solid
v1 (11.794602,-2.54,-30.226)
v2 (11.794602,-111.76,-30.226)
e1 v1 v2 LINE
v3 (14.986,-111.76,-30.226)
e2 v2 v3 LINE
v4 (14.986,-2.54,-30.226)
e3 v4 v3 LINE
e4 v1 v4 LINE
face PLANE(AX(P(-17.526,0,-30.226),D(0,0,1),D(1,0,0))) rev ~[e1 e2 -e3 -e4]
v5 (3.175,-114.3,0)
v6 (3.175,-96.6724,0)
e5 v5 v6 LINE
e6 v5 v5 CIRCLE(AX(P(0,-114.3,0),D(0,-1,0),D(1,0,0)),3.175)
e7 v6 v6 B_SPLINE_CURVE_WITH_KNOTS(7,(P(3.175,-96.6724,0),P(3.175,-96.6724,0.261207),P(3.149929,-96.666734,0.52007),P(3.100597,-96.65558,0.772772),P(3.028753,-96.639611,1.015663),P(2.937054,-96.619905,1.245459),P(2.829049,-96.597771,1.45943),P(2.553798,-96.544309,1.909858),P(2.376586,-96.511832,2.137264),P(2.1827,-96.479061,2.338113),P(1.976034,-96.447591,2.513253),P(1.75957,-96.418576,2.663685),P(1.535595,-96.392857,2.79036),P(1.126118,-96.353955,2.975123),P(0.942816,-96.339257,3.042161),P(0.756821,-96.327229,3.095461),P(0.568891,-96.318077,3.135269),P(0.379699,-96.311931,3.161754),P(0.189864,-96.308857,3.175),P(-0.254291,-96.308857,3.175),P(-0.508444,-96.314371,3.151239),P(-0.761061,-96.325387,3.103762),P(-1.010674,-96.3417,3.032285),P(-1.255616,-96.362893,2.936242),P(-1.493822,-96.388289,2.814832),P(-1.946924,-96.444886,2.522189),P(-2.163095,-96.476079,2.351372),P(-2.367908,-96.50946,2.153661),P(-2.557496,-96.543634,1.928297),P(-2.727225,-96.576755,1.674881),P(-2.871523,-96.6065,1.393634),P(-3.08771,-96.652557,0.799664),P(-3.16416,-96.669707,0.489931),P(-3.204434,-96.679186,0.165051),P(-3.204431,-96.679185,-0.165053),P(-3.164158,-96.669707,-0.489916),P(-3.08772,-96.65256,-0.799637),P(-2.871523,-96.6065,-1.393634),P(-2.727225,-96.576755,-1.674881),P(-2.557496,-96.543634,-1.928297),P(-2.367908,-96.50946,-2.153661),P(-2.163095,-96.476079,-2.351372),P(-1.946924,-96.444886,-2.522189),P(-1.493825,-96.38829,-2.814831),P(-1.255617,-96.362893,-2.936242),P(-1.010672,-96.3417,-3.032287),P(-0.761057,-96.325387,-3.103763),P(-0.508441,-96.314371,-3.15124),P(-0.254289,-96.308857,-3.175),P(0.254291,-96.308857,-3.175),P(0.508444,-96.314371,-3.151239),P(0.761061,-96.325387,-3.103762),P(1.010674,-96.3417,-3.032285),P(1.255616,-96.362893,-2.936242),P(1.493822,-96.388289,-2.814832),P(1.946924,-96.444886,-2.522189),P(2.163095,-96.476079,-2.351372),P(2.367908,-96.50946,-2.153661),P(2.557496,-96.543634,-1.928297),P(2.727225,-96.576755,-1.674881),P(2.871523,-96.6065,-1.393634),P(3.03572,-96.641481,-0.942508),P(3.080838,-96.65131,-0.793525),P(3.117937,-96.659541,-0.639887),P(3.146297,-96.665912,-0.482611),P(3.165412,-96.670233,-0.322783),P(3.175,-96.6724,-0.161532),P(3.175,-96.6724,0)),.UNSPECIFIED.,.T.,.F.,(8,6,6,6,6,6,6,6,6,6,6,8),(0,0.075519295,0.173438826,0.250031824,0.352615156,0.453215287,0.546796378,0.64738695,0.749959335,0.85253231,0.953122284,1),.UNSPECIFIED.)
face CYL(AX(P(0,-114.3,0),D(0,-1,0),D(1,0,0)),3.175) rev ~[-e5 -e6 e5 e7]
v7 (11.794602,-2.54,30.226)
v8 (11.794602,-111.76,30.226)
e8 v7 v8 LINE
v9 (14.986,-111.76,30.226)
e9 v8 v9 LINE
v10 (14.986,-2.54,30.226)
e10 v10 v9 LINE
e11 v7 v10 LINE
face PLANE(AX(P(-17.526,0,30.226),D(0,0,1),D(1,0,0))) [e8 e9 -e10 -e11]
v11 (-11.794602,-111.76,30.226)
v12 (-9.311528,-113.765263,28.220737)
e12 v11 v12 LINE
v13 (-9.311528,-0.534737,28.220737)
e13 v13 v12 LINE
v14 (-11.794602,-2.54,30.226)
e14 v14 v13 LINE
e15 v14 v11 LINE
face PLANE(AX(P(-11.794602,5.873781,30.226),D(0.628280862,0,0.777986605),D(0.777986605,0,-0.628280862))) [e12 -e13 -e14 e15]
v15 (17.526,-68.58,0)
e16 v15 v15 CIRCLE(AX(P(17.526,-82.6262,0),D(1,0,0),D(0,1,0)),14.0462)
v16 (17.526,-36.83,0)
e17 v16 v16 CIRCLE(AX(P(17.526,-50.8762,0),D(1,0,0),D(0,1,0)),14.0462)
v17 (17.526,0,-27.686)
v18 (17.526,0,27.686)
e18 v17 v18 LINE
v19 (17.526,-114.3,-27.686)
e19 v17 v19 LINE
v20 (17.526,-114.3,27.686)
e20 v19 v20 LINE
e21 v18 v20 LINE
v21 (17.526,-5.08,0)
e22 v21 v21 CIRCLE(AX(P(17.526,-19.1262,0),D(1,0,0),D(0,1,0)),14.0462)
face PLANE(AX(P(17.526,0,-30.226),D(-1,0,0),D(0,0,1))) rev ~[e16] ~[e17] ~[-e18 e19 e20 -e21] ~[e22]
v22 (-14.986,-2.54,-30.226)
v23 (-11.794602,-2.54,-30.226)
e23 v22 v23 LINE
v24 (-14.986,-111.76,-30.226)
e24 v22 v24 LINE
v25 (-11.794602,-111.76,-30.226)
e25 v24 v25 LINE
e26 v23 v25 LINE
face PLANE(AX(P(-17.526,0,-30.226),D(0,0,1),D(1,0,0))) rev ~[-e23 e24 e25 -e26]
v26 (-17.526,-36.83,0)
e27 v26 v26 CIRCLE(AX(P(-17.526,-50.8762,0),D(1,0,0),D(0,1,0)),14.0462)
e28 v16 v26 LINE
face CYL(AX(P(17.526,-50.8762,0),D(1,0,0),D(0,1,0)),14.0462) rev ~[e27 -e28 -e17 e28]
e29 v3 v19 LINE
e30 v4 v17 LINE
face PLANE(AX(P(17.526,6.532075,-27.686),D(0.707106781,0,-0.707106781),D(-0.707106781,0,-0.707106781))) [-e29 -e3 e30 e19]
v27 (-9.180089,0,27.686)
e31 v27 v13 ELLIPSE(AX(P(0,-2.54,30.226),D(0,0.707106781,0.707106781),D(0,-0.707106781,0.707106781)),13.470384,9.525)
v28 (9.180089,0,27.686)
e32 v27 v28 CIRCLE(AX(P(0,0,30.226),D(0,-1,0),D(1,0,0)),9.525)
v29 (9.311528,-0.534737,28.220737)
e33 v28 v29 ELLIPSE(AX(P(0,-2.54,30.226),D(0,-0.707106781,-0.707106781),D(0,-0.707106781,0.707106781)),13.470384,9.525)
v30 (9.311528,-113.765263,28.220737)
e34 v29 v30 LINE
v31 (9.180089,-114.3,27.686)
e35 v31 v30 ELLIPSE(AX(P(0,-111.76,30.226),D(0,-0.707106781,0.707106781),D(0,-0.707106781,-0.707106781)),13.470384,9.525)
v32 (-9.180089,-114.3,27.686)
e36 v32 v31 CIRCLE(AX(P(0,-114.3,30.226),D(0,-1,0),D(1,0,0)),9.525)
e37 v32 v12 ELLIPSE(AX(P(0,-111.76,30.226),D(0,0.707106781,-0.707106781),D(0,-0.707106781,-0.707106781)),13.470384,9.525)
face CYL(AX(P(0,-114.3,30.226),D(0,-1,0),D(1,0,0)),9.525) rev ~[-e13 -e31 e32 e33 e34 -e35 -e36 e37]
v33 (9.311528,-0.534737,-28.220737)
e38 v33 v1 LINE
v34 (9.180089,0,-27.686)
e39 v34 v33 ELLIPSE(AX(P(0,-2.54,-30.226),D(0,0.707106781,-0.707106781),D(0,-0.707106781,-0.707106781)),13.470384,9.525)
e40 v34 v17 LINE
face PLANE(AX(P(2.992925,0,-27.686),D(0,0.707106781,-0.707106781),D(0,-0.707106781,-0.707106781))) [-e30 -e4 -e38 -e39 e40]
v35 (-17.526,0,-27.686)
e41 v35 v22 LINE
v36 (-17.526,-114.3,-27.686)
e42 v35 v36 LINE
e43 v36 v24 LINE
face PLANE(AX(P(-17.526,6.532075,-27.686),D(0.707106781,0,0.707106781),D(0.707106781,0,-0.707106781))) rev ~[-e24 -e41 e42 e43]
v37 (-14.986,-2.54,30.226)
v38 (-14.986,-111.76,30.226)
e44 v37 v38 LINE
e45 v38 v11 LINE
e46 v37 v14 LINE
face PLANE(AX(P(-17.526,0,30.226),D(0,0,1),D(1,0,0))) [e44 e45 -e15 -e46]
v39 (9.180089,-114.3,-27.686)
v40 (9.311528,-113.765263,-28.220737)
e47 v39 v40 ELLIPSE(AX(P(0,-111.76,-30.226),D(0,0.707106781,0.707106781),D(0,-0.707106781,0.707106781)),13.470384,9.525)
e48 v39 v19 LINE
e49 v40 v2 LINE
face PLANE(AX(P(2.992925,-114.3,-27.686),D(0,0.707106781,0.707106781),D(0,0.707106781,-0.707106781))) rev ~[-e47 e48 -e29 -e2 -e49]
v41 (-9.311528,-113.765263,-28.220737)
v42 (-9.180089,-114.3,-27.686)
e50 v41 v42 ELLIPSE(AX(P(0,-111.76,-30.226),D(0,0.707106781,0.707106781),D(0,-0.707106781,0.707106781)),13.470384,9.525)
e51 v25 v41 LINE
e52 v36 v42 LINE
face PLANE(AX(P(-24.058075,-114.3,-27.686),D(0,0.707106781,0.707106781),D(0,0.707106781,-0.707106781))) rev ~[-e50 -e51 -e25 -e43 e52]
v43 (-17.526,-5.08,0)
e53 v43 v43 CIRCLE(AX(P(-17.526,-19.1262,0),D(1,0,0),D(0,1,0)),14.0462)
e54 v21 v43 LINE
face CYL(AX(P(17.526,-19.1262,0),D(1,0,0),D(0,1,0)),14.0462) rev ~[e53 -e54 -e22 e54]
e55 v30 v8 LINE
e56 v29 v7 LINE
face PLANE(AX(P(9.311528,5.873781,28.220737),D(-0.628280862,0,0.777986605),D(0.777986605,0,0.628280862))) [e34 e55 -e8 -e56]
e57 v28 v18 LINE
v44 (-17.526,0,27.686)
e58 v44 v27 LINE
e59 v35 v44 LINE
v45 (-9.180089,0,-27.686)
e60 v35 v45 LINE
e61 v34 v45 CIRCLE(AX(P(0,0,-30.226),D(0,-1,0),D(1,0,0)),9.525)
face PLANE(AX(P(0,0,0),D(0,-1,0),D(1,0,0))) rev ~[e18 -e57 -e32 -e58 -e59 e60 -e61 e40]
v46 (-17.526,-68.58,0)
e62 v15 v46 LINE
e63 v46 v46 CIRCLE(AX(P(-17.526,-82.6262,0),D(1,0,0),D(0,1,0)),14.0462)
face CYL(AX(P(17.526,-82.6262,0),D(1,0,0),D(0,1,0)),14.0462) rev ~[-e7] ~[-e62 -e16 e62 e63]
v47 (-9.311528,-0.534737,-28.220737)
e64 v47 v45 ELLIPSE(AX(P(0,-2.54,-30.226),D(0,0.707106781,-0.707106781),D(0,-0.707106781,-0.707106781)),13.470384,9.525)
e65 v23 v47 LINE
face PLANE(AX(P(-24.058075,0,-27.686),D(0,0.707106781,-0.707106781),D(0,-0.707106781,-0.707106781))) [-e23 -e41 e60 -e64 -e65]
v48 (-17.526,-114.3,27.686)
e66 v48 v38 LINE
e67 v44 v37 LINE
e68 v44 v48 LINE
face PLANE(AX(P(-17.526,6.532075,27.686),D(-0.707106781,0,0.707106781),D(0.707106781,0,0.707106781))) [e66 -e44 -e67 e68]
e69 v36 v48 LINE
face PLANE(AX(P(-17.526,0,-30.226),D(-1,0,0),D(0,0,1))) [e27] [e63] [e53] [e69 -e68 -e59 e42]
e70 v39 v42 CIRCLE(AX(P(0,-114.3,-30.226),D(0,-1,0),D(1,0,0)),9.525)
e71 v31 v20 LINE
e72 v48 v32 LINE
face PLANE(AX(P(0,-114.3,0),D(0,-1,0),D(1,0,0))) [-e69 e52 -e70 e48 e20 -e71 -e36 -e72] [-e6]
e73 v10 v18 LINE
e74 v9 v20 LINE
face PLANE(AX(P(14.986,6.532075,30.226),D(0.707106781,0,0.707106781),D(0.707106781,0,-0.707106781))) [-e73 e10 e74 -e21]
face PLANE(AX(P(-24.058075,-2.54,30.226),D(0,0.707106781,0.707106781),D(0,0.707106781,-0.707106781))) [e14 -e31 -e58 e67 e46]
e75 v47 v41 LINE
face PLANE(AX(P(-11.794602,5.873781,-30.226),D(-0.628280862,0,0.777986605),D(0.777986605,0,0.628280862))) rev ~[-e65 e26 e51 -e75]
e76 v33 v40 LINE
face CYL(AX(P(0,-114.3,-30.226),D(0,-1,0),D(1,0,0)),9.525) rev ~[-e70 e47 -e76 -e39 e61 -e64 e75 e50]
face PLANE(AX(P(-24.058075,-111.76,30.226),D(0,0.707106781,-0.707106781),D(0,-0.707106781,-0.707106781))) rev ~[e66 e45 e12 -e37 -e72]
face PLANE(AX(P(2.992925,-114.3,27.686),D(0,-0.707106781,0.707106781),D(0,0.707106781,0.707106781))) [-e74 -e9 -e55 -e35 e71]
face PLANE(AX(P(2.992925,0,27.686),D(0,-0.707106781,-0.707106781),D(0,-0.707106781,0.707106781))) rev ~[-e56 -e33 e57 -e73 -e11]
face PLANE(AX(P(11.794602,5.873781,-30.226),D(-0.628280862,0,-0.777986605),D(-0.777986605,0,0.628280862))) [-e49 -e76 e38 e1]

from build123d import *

# Parameters (mm, degrees)
F0_W        = 35.052
F0_H        = 60.452
F1_DEPTH    = 114.3
F2_R        = 14.0462
F3_DEPTH    = 35.053
F4_R        = 3.175
F5_DEPTH    = 25.4
F6_R        = 9.525
F7_DEPTH    = 114.301
F8_T1_DEPTH = 21.0651495789
F8_T3_DEPTH = 127.3641495789
F8_T5_DEPTH = 126.047561274
F8_T7_DEPTH = 21.0651495789


# Not quite as in the source:
# - a fillet or chamfer that OpenCascade refuses, or shapes differently, is made with other operations: its cross-section is extruded or revolved along the edge and cut away or added


with BuildPart() as f1:
    # F0 (on Front) → F1 (new body)
    with BuildSketch(Plane.XZ):
        Rectangle(F0_W, F0_H)
    extrude(amount=F1_DEPTH)

    # F2 (on face) → F3 (cut, through all)
    with BuildSketch(Plane.YZ.offset(17.526)):
        with Locations((-19.1262, 0)):
            Circle(F2_R)
        with Locations((-50.8762, 0)):
            Circle(F2_R)
        with Locations((-82.6262, 0)):
            Circle(F2_R)
    extrude(amount=-F3_DEPTH, mode=Mode.SUBTRACT)

    # F4 (on face) → F5 (cut)
    with BuildSketch(Plane.XZ.offset(114.3)):
        Circle(F4_R)
    extrude(amount=-F5_DEPTH, mode=Mode.SUBTRACT)

    # F6 (on face) → F7 (cut, through all)
    with BuildSketch(Plane.XZ.offset(114.3)):
        with Locations((0, 30.226)):
            Circle(F6_R)
        with Locations((0, -30.226)):
            Circle(F6_R)
    extrude(amount=-F7_DEPTH, mode=Mode.SUBTRACT)

    # F8: chamfer of 2.54 on 16 edges, made by hand

    # F8_s2 → F8_t1 (cut)
    with BuildSketch(Plane.YZ.offset(-24.0580747894)):
        Polygon((-2.54, 30.226), (0, 27.686), (0, 30.226), align=None)
        Polygon((-111.76, 30.226), (-114.3, 27.686), (-114.3, 30.226), align=None)
        Polygon((0, -27.686), (-2.54, -30.226), (0, -30.226), align=None)
        Polygon((-114.3, -27.686), (-111.76, -30.226), (-114.3, -30.226), align=None)
    extrude(amount=F8_T1_DEPTH, mode=Mode.SUBTRACT)

    # F8_s4 → F8_t3 (cut)
    with BuildSketch(Plane.XZ.offset(-6.5320747894)):
        Polygon((-17.526, 27.686), (-14.986, 30.226), (-17.526, 30.226), align=None)
        Polygon((14.986, 30.226), (17.526, 27.686), (17.526, 30.226), align=None)
        Polygon((-17.526, -27.686), (-14.986, -30.226), (-17.526, -30.226), align=None)
        Polygon((17.526, -27.686), (14.986, -30.226), (17.526, -30.226), align=None)
    extrude(amount=F8_T3_DEPTH, mode=Mode.SUBTRACT)

    # F8_s6 → F8_t5 (cut)
    with BuildSketch(Plane.XZ.offset(-5.873780637)):
        with BuildLine():
            Line((-11.7946015193, 30.226), (-9.3115275153, 28.2207368421))
            ThreePointArc((-9.3115275153, 28.2207368421), (-9.4675743486, 29.181652858), (-9.525, 30.226))
            Line((-9.525, 30.226), (-11.7946015193, 30.226))
        make_face()
        with BuildLine():
            Line((9.3115275153, 28.2207368421), (11.7946015193, 30.226))
            Line((11.7946015193, 30.226), (9.525, 30.226))
            ThreePointArc((9.525, 30.226), (9.4675743486, 29.181652858), (9.3115275153, 28.2207368421))
        make_face()
        with BuildLine():
            Line((-11.7946015193, -30.226), (-9.3115275153, -28.2207368421))
            ThreePointArc((-9.3115275153, -28.2207368421), (-9.4675743486, -29.181652858), (-9.525, -30.226))
            Line((-9.525, -30.226), (-11.7946015193, -30.226))
        make_face()
        with BuildLine():
            Line((11.7946015193, -30.226), (9.3115275153, -28.2207368421))
            ThreePointArc((9.3115275153, -28.2207368421), (9.4675743486, -29.181652858), (9.525, -30.226))
            Line((9.525, -30.226), (11.7946015193, -30.226))
        make_face()
    extrude(amount=F8_T5_DEPTH, mode=Mode.SUBTRACT)

    # F8_s8 → F8_t7 (cut)
    with BuildSketch(Plane.YZ.offset(2.9929252106)):
        Polygon((0, 27.686), (-2.54, 30.226), (0, 30.226), align=None)
        Polygon((-114.3, 27.686), (-111.76, 30.226), (-114.3, 30.226), align=None)
        Polygon((0, -27.686), (-2.54, -30.226), (0, -30.226), align=None)
        Polygon((-114.3, -27.686), (-111.76, -30.226), (-114.3, -30.226), align=None)
    extrude(amount=F8_T7_DEPTH, mode=Mode.SUBTRACT)


solid = f1.part
